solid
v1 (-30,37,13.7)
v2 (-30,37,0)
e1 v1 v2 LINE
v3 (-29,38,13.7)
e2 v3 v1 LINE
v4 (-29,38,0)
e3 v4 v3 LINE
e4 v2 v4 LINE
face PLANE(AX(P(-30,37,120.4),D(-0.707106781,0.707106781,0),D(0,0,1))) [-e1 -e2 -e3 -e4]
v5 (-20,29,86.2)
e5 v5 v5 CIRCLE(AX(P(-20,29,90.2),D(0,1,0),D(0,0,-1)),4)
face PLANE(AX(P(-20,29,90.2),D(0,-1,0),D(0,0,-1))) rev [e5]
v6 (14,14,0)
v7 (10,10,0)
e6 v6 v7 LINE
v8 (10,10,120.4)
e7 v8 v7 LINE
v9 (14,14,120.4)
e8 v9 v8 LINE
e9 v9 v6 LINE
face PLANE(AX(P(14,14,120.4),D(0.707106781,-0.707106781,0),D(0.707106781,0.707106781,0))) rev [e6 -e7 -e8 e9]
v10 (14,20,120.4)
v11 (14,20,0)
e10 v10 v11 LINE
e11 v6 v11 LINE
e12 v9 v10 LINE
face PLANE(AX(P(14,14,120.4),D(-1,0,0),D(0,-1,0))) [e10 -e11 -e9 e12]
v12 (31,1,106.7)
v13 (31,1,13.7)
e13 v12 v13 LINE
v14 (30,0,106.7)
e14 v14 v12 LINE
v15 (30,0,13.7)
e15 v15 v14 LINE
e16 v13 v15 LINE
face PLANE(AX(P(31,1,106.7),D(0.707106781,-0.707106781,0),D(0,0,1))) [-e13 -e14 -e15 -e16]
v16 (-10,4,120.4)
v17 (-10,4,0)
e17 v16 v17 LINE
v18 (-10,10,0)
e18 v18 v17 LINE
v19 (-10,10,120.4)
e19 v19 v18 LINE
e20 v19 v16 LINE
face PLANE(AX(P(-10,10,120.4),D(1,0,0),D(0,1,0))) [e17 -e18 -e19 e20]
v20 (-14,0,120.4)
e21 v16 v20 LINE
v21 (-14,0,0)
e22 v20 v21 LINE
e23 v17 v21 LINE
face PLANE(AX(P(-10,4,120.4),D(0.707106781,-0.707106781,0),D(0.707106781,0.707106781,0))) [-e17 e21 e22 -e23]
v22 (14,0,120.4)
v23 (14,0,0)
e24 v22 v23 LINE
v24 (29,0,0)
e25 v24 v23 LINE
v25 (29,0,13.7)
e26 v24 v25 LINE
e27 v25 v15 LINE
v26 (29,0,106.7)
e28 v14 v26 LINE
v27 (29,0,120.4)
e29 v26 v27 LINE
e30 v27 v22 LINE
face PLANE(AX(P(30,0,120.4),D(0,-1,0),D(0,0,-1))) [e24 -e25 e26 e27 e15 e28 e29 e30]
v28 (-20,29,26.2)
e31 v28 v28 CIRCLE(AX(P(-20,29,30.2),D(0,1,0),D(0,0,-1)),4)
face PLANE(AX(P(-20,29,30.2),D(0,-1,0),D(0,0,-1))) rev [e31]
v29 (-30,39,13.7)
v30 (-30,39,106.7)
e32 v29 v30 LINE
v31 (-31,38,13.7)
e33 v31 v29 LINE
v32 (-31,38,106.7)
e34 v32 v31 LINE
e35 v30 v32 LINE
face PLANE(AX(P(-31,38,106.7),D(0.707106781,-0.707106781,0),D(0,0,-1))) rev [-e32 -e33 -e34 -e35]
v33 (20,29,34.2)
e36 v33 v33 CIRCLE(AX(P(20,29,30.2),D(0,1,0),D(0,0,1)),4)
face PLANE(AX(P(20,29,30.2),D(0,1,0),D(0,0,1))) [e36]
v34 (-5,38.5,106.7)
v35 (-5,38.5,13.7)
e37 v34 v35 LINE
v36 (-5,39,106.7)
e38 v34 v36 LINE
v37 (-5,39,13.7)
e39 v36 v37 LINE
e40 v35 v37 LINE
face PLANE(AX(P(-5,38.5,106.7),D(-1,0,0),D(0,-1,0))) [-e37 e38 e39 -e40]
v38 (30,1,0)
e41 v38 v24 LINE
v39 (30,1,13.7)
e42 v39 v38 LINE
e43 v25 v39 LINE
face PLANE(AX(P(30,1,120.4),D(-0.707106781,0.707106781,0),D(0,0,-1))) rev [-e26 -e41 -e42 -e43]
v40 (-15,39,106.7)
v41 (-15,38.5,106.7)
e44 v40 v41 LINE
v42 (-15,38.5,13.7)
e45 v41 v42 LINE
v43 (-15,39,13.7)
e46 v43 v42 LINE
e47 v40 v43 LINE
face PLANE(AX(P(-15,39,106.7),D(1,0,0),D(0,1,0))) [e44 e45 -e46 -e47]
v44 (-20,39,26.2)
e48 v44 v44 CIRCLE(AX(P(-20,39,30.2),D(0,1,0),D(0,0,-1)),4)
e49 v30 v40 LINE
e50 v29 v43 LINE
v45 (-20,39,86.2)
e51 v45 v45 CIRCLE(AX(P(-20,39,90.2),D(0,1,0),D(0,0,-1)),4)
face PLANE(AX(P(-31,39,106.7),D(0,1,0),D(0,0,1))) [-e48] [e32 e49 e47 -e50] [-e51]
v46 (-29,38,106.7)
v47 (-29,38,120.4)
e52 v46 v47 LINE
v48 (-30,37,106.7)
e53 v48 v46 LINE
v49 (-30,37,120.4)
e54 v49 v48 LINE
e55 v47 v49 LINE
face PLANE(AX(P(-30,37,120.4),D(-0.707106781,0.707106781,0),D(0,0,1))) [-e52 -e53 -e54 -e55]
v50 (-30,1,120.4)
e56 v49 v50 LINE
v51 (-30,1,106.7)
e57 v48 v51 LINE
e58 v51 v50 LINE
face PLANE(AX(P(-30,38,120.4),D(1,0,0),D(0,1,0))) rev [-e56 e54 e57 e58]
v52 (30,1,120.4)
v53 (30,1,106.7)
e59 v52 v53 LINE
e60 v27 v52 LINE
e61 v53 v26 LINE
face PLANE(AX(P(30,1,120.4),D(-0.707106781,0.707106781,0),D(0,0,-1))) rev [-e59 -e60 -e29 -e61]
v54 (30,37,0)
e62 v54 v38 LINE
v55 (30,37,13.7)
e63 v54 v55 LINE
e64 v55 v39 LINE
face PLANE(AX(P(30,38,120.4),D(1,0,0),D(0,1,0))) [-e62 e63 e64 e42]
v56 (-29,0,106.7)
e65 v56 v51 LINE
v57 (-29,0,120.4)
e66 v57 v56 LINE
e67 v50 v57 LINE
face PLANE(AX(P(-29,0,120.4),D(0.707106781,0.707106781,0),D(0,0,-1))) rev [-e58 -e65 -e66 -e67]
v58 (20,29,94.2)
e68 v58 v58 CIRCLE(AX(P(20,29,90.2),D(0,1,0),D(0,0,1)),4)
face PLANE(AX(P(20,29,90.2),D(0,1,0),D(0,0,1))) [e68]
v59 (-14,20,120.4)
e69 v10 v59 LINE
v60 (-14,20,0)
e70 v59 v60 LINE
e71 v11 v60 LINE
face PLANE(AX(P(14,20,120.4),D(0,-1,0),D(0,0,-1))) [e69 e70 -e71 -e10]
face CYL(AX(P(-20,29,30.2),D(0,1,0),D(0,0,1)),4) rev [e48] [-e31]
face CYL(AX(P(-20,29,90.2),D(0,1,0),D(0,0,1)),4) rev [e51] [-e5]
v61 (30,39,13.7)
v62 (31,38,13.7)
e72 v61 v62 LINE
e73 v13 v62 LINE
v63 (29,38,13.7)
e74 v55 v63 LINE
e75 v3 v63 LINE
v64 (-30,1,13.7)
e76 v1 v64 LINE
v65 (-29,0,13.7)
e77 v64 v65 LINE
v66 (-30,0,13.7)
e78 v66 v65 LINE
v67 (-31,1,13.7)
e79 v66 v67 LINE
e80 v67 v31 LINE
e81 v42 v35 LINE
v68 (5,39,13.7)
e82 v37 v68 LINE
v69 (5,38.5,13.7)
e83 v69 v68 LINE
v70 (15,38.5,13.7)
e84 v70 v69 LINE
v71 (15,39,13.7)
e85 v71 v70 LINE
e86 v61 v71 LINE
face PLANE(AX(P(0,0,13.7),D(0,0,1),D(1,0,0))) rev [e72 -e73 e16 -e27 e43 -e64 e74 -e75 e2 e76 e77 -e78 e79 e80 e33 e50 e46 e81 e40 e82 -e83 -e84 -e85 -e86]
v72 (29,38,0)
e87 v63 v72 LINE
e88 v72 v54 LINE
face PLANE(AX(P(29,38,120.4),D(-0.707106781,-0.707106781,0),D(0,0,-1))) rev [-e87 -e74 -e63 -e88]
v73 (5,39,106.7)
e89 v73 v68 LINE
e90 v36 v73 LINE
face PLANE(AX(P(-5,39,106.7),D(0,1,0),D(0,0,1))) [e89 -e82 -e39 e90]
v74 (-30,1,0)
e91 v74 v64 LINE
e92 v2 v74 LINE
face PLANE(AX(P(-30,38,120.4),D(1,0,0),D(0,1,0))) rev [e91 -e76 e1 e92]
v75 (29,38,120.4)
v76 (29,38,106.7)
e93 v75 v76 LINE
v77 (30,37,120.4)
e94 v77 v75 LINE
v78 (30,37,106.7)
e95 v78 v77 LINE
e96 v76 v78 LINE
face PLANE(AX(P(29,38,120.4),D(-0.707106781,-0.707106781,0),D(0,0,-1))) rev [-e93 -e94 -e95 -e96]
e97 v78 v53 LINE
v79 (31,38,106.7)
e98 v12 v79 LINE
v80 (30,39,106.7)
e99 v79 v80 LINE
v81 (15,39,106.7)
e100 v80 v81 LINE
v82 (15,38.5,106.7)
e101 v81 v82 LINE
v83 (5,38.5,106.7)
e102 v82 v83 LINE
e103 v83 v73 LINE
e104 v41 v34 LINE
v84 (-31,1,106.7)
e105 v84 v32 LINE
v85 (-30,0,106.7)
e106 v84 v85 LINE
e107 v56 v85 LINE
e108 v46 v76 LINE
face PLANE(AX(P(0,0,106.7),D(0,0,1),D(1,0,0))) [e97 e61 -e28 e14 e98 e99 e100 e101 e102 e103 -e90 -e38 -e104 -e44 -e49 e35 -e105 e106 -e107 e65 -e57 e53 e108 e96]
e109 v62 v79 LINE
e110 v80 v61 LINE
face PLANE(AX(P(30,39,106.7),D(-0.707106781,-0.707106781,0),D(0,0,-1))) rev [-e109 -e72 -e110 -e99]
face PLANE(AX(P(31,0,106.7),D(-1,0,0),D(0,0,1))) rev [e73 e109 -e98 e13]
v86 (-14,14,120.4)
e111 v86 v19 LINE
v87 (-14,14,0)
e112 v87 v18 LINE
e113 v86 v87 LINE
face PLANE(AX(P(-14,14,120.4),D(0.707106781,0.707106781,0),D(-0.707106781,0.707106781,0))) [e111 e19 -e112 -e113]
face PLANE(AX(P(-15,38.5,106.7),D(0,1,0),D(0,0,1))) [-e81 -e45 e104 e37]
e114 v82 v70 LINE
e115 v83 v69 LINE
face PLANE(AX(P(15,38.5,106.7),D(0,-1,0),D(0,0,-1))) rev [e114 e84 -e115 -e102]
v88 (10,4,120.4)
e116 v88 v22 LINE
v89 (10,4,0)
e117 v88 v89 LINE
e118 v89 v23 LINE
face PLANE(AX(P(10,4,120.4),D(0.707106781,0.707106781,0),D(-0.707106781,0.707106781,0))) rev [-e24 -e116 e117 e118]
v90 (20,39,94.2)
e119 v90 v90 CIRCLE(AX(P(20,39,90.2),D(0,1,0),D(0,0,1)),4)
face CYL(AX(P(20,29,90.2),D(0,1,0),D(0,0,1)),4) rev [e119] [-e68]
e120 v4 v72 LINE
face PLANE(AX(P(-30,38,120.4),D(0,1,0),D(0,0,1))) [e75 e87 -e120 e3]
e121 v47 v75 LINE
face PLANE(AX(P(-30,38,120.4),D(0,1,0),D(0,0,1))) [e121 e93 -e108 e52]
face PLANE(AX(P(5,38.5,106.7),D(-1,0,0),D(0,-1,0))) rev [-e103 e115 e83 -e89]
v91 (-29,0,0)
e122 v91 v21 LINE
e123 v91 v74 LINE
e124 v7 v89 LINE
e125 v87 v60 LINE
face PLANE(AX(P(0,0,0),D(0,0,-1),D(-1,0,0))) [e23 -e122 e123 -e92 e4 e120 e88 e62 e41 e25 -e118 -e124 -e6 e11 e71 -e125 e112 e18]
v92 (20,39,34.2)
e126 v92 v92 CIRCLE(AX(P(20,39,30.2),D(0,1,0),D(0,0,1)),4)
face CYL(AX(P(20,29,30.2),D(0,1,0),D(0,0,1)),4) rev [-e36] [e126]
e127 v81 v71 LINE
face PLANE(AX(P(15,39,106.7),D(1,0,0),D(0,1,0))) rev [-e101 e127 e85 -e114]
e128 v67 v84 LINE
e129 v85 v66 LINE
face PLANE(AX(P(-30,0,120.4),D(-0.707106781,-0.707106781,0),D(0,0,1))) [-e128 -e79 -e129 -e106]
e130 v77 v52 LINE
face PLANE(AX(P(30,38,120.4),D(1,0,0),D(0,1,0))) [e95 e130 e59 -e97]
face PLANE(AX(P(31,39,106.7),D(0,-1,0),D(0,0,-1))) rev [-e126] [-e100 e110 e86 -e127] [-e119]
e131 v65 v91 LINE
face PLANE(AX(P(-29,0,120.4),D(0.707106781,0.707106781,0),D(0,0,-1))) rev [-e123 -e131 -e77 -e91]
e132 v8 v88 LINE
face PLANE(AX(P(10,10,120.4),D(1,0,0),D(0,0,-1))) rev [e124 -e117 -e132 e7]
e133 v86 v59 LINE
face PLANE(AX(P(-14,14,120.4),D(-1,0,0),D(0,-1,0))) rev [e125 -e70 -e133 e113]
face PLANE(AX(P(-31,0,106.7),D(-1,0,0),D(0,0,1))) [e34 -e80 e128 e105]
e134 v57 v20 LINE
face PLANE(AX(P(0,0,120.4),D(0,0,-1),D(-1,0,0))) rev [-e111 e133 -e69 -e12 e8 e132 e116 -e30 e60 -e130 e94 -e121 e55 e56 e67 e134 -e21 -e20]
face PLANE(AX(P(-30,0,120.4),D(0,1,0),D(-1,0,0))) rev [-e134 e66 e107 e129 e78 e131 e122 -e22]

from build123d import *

# Parameters (mm, degrees)
EXTRUDE_1_DEPTH     = 120.4
EXTRUDE_2_DEPTH     = 46.5
SKETCH_4_R          = 4
CUT_EXTRUDE_1_DEPTH = 10
CHAMFER_1_SIZE      = 1


with BuildPart() as part:
    # 草图1 → 凸台-拉伸1 (new body)
    with BuildSketch(Plane.XY):
        Polygon((-30, 38), (30, 38), (30, 0), (14, 0), (10, 4), (10, 10), (14, 14), (14, 20), (-14, 20), (-14, 14), (-10, 10), (-10, 4), (-14, 0), (-30, 0), align=None)
    extrude(amount=EXTRUDE_1_DEPTH)

    # 草图2 → 凸台-拉伸2 (add, symmetric)
    with BuildSketch(Plane.XY.offset(60.2)):
        Polygon((-31, 0), (-30, 0), (-30, 38), (30, 38), (30, 0), (31, 0), (31, 39), (15, 39), (15, 38.5), (5, 38.5), (5, 39), (-5, 39), (-5, 38.5), (-15, 38.5), (-15, 39), (-31, 39), align=None)
    extrude(amount=EXTRUDE_2_DEPTH, both=True)

    # 草图4 → 切除-拉伸1 (cut)
    with BuildSketch(Plane(origin=(0, 39, 0), x_dir=(1, 0, 0), z_dir=(0, 1, 0))):
        with Locations(Location((20, -30.2, 0), (0, 0, 270))):
            Circle(SKETCH_4_R)
        with Locations(Location((20, -90.2, 0), (0, 0, 270))):
            Circle(SKETCH_4_R)
        with Locations(Location((-20, -90.2, 0), (0, 0, 90))):
            Circle(SKETCH_4_R)
        with Locations(Location((-20, -30.2, 0), (0, 0, 90))):
            Circle(SKETCH_4_R)
    extrude(amount=-CUT_EXTRUDE_1_DEPTH, mode=Mode.SUBTRACT)

    # 倒角1
    chamfer_1_edges = [part.edges().sort_by_distance(p)[0] for p in [
        (30, 0, 113.55),
        (31, 0, 60.2),
        (30, 0, 6.85),
        (-30, 38, 6.85),
        (30, 38, 6.85),
        (31, 39, 60.2),
        (30, 38, 113.55),
        (-31, 39, 60.2),
        (-30, 38, 113.55),
        (-30, 0, 6.85),
        (-30, 0, 113.55),
        (-31, 0, 60.2),
    ]]
    chamfer(chamfer_1_edges, length=CHAMFER_1_SIZE - 0.0001)  # a hair under: the kernel refuses the full size


solid = part.part
